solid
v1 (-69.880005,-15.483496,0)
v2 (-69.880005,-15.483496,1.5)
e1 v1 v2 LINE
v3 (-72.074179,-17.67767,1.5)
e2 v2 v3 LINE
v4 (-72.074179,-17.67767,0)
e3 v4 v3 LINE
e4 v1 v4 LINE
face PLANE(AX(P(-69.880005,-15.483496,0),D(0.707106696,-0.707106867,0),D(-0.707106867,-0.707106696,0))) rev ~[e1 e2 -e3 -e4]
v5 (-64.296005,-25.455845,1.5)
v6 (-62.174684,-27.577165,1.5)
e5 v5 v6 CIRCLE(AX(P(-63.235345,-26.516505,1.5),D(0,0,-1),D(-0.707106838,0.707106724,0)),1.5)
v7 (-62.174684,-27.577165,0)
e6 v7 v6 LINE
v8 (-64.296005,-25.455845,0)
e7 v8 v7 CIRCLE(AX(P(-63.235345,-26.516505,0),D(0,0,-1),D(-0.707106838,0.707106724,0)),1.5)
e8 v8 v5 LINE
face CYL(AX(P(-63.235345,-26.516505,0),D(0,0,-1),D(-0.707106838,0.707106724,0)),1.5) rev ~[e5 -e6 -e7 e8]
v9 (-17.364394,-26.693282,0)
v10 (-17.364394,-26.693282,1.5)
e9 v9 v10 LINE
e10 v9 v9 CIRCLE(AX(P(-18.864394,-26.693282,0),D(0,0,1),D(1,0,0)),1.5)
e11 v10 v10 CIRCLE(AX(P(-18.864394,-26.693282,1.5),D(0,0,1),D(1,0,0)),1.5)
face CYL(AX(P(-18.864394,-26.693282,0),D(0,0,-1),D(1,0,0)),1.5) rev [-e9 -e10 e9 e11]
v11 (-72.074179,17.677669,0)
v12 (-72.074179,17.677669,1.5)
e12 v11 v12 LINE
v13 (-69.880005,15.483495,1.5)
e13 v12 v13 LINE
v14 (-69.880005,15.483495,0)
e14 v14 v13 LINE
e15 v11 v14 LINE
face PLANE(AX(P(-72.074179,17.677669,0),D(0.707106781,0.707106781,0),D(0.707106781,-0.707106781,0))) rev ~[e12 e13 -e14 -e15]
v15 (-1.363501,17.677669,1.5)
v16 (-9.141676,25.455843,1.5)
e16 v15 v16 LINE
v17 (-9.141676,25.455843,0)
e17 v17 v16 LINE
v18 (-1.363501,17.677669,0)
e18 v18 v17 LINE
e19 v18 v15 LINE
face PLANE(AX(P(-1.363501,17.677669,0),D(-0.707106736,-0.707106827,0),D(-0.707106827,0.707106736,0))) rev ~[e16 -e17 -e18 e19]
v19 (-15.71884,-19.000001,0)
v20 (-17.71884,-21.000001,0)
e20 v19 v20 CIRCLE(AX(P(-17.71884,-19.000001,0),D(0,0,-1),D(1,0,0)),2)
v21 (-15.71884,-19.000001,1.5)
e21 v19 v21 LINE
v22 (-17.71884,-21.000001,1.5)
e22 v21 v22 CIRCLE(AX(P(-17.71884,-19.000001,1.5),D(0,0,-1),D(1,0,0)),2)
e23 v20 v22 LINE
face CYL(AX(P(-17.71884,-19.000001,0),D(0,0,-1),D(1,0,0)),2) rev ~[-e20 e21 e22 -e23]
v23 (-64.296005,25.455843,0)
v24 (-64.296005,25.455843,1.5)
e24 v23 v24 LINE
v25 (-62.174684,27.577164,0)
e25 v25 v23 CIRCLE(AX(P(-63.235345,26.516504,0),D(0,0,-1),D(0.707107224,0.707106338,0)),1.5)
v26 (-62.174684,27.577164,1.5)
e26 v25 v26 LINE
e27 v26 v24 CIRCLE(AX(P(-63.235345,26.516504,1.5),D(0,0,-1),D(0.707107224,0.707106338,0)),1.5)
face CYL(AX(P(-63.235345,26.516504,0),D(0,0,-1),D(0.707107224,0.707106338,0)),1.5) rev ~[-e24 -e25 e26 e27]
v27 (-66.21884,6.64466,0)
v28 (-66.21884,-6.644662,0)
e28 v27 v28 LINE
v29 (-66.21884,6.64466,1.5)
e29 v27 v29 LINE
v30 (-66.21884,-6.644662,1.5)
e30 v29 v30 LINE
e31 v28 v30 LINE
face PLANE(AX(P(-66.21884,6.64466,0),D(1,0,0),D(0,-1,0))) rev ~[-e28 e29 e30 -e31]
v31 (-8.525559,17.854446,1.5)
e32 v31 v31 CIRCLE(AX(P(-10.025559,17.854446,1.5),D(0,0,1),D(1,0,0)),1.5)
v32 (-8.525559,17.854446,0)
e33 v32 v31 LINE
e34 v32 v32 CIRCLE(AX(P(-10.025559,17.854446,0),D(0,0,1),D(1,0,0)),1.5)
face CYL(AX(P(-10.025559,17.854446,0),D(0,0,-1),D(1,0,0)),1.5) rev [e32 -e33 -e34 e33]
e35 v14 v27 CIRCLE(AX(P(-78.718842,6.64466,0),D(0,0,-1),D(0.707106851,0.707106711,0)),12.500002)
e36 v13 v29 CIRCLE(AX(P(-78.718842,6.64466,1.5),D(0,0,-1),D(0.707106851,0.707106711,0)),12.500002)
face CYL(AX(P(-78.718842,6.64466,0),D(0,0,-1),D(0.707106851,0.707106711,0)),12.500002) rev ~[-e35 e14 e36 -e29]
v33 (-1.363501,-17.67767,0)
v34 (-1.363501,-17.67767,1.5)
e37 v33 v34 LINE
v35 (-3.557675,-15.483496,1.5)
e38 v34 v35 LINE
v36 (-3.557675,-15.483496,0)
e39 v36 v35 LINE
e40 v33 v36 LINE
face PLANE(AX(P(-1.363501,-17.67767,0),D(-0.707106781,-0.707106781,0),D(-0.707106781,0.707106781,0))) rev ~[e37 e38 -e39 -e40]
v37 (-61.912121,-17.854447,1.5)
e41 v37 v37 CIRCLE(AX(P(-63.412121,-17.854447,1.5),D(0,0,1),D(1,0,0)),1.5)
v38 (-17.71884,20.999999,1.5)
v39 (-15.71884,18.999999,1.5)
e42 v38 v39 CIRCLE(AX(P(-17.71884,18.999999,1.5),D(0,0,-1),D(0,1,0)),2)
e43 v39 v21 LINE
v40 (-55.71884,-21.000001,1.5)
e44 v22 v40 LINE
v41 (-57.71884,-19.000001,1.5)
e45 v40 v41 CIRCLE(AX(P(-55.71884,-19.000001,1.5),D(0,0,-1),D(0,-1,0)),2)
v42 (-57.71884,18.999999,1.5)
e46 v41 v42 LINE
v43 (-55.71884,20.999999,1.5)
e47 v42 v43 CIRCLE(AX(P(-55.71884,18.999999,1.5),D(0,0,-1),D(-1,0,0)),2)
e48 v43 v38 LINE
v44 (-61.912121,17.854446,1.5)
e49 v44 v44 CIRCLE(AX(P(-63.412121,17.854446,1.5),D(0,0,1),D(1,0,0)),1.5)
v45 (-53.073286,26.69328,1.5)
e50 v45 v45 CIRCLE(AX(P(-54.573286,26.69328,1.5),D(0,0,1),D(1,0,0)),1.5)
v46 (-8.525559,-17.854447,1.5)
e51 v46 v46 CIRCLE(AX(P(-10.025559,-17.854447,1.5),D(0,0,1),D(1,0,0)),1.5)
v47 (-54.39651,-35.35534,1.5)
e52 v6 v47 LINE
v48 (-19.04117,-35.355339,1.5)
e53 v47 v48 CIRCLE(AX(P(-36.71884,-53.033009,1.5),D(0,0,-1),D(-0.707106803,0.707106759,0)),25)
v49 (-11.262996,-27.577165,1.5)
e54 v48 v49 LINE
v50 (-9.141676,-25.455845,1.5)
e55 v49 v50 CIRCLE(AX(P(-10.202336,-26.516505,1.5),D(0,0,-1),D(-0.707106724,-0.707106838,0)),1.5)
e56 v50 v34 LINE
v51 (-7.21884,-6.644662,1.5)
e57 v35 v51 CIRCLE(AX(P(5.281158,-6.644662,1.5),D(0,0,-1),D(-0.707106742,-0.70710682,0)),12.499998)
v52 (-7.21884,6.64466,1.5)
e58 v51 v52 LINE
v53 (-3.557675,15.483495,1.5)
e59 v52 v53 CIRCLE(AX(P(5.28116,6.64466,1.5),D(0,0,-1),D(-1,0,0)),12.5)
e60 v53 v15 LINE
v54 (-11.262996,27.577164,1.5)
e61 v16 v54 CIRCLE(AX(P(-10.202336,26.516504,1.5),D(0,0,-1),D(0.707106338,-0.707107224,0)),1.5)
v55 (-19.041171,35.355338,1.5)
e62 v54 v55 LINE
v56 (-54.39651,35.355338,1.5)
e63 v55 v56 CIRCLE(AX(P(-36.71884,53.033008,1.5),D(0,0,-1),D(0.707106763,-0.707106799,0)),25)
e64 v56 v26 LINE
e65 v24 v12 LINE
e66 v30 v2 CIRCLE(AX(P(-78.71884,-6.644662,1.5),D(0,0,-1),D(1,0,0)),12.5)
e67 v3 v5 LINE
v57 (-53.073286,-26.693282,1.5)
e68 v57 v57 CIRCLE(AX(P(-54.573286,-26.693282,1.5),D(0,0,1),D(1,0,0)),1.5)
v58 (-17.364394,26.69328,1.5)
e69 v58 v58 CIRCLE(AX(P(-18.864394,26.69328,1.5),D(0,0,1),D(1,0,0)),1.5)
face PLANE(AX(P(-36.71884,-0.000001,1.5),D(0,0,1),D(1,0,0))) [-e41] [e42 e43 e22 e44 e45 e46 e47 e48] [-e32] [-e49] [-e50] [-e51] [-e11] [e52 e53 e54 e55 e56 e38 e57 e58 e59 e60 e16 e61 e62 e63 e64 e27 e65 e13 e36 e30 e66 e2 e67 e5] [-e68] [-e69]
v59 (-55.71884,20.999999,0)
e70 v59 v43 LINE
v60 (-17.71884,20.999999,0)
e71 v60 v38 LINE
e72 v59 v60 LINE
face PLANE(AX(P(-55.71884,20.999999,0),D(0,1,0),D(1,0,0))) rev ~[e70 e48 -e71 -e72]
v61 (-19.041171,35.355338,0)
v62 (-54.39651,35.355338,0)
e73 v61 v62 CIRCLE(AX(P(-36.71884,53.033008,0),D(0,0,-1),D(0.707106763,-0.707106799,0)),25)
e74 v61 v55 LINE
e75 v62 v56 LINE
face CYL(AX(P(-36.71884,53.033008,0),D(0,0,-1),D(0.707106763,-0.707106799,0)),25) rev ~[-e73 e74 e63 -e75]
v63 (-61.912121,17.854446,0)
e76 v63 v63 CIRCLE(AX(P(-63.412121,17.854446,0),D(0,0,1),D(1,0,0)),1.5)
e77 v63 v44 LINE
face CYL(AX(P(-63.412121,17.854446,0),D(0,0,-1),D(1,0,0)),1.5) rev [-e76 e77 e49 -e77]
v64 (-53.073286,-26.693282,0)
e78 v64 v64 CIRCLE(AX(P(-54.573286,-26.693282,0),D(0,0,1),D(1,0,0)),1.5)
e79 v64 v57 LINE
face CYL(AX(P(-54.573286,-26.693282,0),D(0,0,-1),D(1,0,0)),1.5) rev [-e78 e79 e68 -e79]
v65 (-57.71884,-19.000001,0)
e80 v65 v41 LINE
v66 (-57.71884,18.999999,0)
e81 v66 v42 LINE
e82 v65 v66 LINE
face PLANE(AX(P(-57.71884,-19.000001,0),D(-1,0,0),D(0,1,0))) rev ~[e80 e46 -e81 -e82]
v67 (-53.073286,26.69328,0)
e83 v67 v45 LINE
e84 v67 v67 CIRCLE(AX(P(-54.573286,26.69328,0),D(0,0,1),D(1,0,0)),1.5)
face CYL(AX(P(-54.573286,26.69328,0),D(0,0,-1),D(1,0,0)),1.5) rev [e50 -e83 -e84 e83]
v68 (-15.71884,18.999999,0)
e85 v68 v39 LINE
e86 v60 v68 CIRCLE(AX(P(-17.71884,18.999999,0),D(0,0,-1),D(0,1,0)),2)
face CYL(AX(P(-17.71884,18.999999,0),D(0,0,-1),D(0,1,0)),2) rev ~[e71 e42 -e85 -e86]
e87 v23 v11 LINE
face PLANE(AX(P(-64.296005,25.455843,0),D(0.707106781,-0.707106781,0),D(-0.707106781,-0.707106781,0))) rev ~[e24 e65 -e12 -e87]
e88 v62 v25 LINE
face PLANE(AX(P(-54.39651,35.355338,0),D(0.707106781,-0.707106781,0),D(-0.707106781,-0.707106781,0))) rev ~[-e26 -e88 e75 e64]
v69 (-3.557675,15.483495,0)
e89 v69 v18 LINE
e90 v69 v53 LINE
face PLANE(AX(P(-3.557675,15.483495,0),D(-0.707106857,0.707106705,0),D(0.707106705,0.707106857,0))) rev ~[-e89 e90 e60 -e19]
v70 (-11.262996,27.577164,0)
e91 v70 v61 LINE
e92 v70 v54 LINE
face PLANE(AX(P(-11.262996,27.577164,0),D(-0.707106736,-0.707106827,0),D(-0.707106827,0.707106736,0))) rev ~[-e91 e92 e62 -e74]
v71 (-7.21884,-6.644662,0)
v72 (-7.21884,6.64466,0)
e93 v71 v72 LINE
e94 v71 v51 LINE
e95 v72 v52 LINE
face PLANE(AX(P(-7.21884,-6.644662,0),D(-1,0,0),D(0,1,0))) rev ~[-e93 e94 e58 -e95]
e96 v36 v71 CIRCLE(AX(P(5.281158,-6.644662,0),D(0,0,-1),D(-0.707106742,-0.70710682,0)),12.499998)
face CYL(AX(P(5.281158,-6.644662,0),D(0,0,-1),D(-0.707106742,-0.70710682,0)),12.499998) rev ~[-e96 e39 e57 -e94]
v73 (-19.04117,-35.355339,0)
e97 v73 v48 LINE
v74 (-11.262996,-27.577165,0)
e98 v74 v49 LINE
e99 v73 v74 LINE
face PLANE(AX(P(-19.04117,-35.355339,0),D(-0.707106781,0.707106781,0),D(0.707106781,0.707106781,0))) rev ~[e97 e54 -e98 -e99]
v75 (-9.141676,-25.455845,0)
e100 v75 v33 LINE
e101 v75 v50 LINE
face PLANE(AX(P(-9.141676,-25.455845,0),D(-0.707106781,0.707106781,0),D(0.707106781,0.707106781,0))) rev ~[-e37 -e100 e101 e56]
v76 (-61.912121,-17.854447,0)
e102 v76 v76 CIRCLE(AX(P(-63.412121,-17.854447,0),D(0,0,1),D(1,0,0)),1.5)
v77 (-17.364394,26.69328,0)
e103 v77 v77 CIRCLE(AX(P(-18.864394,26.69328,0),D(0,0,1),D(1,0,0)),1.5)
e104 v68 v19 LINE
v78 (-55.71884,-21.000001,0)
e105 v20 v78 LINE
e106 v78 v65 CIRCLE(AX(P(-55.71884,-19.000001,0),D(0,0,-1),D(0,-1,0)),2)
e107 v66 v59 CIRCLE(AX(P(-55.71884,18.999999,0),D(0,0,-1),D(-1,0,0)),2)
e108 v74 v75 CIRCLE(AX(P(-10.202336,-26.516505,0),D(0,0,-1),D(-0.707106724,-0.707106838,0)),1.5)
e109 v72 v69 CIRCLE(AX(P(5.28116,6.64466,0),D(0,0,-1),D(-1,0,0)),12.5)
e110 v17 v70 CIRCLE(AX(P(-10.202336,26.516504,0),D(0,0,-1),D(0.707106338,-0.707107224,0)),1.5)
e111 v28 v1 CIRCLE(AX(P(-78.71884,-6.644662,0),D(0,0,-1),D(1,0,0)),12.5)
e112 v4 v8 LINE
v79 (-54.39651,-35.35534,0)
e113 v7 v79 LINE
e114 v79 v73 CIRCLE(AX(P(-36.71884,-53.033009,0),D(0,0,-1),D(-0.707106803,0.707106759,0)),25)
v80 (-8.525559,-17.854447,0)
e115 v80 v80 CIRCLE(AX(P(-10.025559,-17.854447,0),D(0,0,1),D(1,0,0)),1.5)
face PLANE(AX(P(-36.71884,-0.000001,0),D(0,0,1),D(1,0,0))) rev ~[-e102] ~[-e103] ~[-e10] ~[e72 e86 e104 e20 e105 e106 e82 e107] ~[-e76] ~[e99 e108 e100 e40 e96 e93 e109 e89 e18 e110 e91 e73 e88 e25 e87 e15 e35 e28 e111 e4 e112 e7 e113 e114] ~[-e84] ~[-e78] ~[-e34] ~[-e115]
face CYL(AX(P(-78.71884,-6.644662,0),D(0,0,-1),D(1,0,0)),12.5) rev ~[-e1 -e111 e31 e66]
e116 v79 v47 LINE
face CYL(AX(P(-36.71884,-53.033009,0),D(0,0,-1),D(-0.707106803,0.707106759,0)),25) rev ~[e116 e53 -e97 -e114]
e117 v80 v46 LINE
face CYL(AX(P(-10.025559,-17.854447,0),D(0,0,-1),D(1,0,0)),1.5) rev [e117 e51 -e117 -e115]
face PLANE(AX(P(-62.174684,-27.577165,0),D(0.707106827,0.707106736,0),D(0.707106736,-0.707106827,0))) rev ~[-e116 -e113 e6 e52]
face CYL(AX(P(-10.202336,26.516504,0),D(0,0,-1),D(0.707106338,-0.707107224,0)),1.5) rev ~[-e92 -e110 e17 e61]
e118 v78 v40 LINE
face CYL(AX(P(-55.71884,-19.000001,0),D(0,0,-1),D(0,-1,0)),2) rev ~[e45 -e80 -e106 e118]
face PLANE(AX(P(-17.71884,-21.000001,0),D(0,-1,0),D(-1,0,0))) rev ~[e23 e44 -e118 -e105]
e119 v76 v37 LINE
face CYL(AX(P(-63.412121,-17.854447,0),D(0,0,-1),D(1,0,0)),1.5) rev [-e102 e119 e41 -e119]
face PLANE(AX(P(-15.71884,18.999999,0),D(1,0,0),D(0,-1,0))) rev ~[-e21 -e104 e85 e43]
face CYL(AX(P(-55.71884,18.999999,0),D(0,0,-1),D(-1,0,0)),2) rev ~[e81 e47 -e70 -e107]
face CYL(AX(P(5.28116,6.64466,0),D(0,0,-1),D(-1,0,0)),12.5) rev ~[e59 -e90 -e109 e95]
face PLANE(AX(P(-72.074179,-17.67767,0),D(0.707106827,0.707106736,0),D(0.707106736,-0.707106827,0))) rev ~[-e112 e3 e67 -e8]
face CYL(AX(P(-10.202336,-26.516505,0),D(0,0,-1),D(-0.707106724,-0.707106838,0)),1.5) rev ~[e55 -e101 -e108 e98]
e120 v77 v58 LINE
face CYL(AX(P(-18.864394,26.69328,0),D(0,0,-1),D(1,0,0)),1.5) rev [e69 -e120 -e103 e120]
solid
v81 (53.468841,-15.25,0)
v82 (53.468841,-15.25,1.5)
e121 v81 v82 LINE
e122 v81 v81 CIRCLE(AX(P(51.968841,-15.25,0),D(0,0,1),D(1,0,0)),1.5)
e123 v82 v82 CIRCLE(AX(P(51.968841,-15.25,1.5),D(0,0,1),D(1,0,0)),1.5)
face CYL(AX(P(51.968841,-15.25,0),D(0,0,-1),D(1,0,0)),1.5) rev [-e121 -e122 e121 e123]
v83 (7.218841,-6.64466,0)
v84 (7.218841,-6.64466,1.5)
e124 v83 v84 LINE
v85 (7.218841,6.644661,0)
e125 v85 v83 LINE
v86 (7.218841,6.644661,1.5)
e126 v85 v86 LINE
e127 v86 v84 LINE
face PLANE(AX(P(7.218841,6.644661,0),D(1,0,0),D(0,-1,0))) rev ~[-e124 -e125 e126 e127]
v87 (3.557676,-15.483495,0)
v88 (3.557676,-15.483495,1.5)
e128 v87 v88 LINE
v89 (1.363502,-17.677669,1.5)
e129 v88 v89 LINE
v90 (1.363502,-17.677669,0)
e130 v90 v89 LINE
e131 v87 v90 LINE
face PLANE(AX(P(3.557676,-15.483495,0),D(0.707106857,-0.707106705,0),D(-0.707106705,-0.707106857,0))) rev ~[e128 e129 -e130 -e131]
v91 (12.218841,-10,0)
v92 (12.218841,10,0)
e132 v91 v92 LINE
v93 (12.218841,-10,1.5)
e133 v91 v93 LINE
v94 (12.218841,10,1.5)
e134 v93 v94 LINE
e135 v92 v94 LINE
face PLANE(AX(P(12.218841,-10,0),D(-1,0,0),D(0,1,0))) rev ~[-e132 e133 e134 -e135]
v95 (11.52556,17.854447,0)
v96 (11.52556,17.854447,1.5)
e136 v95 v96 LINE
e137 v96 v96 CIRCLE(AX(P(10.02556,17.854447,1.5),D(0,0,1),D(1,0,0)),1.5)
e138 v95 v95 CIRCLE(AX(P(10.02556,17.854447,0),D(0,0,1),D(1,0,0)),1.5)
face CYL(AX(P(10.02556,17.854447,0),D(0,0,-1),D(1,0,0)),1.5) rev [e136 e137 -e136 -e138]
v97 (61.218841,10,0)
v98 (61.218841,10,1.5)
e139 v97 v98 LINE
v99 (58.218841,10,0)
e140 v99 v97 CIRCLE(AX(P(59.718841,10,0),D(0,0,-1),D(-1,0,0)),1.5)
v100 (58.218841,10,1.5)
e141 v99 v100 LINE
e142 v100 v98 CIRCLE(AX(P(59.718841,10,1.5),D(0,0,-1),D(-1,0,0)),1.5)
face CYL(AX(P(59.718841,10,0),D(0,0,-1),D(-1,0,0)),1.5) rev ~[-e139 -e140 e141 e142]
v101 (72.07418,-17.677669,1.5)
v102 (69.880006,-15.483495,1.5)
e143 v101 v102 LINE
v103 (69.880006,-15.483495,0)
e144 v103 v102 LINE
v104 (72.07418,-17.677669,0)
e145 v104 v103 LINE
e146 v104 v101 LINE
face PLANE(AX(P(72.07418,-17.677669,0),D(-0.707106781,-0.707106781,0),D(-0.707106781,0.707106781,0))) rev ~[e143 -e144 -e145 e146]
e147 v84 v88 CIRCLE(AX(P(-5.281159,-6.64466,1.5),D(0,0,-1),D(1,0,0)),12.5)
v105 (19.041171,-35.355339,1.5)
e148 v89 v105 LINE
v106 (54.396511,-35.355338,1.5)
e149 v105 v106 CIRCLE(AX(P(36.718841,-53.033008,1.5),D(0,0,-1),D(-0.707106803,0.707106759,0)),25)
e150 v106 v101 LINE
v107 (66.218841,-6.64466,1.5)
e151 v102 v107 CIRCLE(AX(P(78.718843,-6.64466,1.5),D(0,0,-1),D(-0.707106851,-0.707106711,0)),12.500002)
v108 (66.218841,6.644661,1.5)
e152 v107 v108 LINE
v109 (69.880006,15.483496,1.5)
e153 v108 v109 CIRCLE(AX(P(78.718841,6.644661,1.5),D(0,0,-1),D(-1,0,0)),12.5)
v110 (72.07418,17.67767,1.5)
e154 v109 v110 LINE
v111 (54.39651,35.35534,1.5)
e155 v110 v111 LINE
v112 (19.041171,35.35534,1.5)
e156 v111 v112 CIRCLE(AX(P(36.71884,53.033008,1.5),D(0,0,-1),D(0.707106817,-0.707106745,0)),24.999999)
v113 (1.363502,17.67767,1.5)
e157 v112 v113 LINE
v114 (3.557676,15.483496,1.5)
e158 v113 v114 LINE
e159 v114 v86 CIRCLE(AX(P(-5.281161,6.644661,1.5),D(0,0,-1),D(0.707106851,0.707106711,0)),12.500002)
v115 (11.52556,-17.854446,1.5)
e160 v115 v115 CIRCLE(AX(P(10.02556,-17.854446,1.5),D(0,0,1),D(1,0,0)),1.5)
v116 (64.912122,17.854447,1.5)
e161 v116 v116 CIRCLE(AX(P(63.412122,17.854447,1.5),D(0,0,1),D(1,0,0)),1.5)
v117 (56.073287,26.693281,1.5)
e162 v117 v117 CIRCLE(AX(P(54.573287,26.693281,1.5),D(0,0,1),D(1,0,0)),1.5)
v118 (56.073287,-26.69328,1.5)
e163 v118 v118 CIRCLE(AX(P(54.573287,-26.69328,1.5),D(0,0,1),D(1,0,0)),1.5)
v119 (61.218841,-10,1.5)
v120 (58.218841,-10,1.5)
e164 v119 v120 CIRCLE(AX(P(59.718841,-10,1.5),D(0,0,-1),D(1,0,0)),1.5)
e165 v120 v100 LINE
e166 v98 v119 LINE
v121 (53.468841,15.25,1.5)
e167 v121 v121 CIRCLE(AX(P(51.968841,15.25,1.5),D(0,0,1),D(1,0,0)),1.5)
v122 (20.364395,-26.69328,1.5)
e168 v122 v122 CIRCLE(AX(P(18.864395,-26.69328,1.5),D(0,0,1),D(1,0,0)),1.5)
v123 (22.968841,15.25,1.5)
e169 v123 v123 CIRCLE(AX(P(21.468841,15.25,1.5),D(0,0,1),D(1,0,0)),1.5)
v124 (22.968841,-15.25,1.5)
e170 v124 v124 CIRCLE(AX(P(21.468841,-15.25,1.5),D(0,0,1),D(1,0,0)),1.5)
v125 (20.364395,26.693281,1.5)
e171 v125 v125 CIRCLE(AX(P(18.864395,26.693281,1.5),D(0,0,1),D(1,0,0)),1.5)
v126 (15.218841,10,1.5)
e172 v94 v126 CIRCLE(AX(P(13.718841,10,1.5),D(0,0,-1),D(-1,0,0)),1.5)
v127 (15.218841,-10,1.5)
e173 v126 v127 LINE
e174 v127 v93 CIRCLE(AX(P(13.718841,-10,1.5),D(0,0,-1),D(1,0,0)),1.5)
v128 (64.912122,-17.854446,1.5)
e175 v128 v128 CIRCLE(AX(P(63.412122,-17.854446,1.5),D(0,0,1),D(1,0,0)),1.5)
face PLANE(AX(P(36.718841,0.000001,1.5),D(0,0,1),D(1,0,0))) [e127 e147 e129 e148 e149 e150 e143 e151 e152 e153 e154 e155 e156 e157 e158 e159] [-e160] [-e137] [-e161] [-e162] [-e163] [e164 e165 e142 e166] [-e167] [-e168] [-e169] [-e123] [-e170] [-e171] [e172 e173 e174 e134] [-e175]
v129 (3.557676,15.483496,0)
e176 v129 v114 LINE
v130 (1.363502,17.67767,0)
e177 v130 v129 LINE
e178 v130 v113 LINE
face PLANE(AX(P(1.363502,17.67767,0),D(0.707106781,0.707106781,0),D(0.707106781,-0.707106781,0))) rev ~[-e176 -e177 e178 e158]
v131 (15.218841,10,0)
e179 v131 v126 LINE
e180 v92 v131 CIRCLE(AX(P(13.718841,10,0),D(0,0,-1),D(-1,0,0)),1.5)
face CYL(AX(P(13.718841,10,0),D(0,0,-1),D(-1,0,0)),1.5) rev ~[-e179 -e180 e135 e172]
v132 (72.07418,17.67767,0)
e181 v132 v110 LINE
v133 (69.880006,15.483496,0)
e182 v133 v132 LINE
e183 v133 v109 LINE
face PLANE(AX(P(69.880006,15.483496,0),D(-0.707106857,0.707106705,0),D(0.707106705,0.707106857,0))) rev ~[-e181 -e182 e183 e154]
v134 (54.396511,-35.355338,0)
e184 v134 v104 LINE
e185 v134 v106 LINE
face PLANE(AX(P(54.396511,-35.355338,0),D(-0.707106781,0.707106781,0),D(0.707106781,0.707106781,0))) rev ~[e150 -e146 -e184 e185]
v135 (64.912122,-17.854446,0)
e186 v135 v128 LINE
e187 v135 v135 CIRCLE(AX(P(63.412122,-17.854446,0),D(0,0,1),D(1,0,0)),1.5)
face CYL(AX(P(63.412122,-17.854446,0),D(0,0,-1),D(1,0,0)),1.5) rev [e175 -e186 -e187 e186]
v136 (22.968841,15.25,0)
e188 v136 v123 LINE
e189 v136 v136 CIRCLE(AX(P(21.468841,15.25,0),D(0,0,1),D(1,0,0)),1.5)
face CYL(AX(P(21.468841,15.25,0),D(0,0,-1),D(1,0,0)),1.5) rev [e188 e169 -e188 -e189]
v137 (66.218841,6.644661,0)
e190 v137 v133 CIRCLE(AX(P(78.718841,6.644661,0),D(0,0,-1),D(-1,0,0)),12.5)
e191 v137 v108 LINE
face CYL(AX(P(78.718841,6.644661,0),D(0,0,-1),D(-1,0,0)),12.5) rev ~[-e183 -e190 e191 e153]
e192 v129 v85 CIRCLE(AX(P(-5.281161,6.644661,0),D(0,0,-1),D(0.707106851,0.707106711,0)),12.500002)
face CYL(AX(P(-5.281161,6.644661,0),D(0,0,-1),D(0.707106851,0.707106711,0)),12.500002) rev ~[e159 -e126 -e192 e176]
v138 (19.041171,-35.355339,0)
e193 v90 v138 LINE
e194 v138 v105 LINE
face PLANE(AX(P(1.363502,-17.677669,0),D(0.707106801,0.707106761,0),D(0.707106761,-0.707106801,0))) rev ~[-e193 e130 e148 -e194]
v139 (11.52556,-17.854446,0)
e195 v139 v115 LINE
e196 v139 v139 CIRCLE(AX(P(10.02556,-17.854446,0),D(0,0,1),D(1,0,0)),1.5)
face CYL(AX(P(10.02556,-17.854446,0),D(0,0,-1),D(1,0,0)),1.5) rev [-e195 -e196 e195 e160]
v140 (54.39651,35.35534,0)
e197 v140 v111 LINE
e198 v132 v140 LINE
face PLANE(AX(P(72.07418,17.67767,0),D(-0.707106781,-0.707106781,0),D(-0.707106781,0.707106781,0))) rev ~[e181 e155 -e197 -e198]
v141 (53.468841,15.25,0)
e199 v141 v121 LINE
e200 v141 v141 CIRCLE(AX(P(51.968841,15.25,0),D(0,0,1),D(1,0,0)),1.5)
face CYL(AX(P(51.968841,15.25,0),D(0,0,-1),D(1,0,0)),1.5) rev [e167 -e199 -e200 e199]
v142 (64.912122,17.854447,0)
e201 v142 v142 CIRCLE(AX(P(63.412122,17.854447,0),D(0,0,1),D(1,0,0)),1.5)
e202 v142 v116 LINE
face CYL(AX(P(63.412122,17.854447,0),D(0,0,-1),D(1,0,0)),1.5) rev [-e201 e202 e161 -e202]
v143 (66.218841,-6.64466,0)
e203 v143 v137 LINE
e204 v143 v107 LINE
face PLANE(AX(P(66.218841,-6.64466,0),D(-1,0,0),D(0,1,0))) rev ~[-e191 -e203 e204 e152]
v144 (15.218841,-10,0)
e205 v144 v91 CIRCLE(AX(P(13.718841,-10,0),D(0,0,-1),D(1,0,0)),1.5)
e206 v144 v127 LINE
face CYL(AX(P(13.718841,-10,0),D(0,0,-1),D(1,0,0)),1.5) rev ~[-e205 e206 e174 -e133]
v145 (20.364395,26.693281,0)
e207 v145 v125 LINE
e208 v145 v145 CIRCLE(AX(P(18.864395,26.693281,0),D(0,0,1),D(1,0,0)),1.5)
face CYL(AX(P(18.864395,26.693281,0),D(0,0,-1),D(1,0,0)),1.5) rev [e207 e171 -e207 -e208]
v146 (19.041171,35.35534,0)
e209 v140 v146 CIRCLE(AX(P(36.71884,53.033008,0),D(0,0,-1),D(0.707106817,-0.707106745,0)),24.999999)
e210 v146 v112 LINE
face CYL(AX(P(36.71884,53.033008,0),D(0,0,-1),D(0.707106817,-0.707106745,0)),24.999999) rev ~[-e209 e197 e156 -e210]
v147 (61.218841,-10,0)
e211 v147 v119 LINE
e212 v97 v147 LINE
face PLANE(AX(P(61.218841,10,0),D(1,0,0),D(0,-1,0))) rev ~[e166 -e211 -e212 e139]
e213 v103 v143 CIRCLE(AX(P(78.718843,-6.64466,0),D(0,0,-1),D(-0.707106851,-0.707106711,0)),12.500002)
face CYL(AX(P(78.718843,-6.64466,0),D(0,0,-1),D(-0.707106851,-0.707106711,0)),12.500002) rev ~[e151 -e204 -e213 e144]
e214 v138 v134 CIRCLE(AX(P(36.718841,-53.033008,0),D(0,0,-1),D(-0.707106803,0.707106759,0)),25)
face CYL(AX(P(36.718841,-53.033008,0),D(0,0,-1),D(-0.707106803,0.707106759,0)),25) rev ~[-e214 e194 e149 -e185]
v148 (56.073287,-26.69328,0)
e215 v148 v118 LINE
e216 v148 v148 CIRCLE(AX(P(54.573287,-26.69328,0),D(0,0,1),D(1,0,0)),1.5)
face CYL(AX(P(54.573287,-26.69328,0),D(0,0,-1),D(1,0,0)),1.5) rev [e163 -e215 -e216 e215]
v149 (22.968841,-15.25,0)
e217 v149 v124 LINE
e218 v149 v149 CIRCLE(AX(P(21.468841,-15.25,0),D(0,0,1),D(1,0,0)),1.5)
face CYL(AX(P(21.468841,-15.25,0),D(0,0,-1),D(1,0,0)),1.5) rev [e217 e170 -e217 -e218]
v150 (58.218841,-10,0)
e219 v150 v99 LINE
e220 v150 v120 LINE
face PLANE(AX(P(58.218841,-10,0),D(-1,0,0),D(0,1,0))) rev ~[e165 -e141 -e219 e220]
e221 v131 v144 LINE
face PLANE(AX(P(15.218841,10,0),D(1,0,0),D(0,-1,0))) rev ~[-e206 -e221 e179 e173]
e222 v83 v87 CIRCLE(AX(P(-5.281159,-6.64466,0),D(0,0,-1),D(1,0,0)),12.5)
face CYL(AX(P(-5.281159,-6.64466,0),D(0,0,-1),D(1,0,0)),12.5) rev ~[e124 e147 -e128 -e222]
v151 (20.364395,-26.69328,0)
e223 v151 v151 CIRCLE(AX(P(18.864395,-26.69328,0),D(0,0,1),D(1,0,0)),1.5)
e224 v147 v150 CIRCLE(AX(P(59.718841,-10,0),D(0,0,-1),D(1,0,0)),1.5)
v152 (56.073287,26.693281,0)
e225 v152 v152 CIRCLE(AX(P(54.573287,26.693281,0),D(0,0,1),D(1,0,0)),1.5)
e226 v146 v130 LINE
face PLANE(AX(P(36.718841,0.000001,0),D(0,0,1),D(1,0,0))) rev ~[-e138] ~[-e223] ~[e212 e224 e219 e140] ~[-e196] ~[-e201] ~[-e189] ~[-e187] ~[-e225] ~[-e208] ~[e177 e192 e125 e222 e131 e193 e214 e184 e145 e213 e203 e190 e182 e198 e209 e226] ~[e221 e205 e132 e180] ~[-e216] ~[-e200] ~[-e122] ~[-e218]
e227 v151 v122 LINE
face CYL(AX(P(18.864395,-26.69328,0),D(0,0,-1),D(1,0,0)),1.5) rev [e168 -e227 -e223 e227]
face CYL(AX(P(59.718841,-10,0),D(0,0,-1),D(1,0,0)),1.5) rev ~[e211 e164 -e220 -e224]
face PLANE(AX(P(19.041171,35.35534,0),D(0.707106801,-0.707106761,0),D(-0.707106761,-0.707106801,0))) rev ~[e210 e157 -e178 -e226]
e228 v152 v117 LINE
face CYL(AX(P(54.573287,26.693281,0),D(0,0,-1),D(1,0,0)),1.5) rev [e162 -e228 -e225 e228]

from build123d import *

# Parameters (mm, degrees)
F0_R     = 1.5
F1_DEPTH = 1.5


# Not quite as in the source:
# - ends of sketch curves that miss each other by under 0.0002 mm in the source are joined


with BuildPart() as f1:
    # F0 (on Top) → F1 (new body)
    with BuildSketch(Plane.XY):
        with BuildLine():
            Line((-66.21884, 6.64466), (-66.21884, -1e-06))
            Line((-66.21884, -1e-06), (-66.21884, -6.644662))
            ThreePointArc((-66.21884, -6.644662), (-67.1703457083, -11.4282045779), (-69.8800047352, -15.4834962648))
            Line((-69.8800047352, -15.4834962648), (-72.074179, -17.67767))
            Line((-72.074179, -17.67767), (-64.296005, -25.455845))
            ThreePointArc((-64.296005, -25.455845), (-62.1746850782, -25.4558445782), (-62.1746843282, -27.5771646718))
            Line((-62.1746843282, -27.5771646718), (-54.39651, -35.35534))
            ThreePointArc((-54.39651, -35.35534), (-36.7188403536, -28.033009), (-19.0411704703, -35.3553394703))
            Line((-19.0411704703, -35.3553394703), (-11.262996, -27.577165))
            ThreePointArc((-11.262996, -27.577165), (-11.2629961718, -25.4558448282), (-9.1416758282, -25.4558448282))
            Line((-9.1416758282, -25.4558448282), (-1.363501, -17.67767))
            Line((-1.363501, -17.67767), (-3.557675, -15.483496))
            ThreePointArc((-3.557675, -15.483496), (-6.2673342917, -11.4282045779), (-7.21884, -6.644662))
            Line((-7.21884, -6.644662), (-7.21884, -1e-06))
            Line((-7.21884, -1e-06), (-7.21884, 6.64466))
            ThreePointArc((-7.21884, 6.64466), (-6.2673341564, 11.4282029046), (-3.5576747648, 15.4834947648))
            Line((-3.5576747648, 15.4834947648), (-1.363501, 17.677669))
            Line((-1.363501, 17.677669), (-9.141676, 25.455843))
            ThreePointArc((-9.141676, 25.455843), (-11.2629964218, 25.4558440782), (-11.2629961718, 27.5771641718))
            Line((-11.2629961718, 27.5771641718), (-19.041171, 35.355338))
            ThreePointArc((-19.041171, 35.355338), (-36.7188403536, 28.033008), (-54.3965095297, 35.3553384703))
            Line((-54.3965095297, 35.3553384703), (-62.174684, 27.577164))
            ThreePointArc((-62.174684, 27.577164), (-62.1746848282, 25.4558438282), (-64.2960046718, 25.4558433282))
            Line((-64.2960046718, 25.4558433282), (-72.074179, 17.677669))
            Line((-72.074179, 17.677669), (-69.880005, 15.483495))
            ThreePointArc((-69.880005, 15.483495), (-67.1703458436, 11.4282029046), (-66.21884, 6.64466))
        make_face()
        with Locations((-54.573286, -26.693282)):
            Circle(F0_R, mode=Mode.SUBTRACT)
        with Locations((-63.412121, -17.854447)):
            Circle(F0_R, mode=Mode.SUBTRACT)
        with Locations((-18.864394, -26.693282)):
            Circle(F0_R, mode=Mode.SUBTRACT)
        with Locations((-10.025559, -17.854447)):
            Circle(F0_R, mode=Mode.SUBTRACT)
        with BuildLine():
            ThreePointArc((-57.71884, 18.999999), (-57.1330535624, 20.4142125624), (-55.71884, 20.999999))
            Line((-55.71884, 20.999999), (-17.71884, 20.999999))
            ThreePointArc((-17.71884, 20.999999), (-16.3046264376, 20.4142125624), (-15.71884, 18.999999))
            Line((-15.71884, 18.999999), (-15.71884, -19.000001))
            ThreePointArc((-15.71884, -19.000001), (-16.3046264376, -20.4142145624), (-17.71884, -21.000001))
            Line((-17.71884, -21.000001), (-55.71884, -21.000001))
            ThreePointArc((-55.71884, -21.000001), (-57.1330535624, -20.4142145624), (-57.71884, -19.000001))
            Line((-57.71884, -19.000001), (-57.71884, 18.999999))
        make_face(mode=Mode.SUBTRACT)
        with Locations((-63.412121, 17.854446)):
            Circle(F0_R, mode=Mode.SUBTRACT)
        with Locations((-54.573286, 26.69328)):
            Circle(F0_R, mode=Mode.SUBTRACT)
        with Locations((-10.025559, 17.854446)):
            Circle(F0_R, mode=Mode.SUBTRACT)
        with Locations((-18.864394, 26.69328)):
            Circle(F0_R, mode=Mode.SUBTRACT)
    extrude(amount=F1_DEPTH)


with BuildPart() as f1b:
    # F0 (on Top) → F1, piece 2 (new body)
    with BuildSketch(Plane.XY):
        with BuildLine():
            Line((7.218841, 6.644661), (7.218841, 0))
            Line((7.218841, 0), (7.218841, -6.64466))
            ThreePointArc((7.218841, -6.64466), (6.2673351564, -11.4282029046), (3.5576757648, -15.4834947648))
            Line((3.5576757648, -15.4834947648), (1.363502, -17.677669))
            Line((1.363502, -17.677669), (19.041171, -35.355339))
            ThreePointArc((19.041171, -35.355339), (36.7188406464, -28.033008), (54.3965105297, -35.3553384703))
            Line((54.3965105297, -35.3553384703), (72.07418, -17.677669))
            Line((72.07418, -17.677669), (69.880006, -15.483495))
            ThreePointArc((69.880006, -15.483495), (67.1703468436, -11.4282029046), (66.218841, -6.64466))
            Line((66.218841, -6.64466), (66.218841, 0))
            Line((66.218841, 0), (66.218841, 6.644661))
            ThreePointArc((66.218841, 6.644661), (67.1703468436, 11.4282039046), (69.8800062352, 15.4834957648))
            Line((69.8800062352, 15.4834957648), (72.07418, 17.67767))
            Line((72.07418, 17.67767), (54.39651, 35.35534))
            ThreePointArc((54.39651, 35.35534), (36.7188406464, 28.033009), (19.0411709703, 35.3553399703))
            Line((19.0411709703, 35.3553399703), (1.363502, 17.67767))
            Line((1.363502, 17.67767), (3.557676, 15.483496))
            ThreePointArc((3.557676, 15.483496), (6.2673351564, 11.4282039046), (7.218841, 6.644661))
        make_face()
        with Locations((18.864395, -26.69328)):
            Circle(F0_R, mode=Mode.SUBTRACT)
        with Locations((10.02556, -17.854446)):
            Circle(F0_R, mode=Mode.SUBTRACT)
        with Locations((54.573287, -26.69328)):
            Circle(F0_R, mode=Mode.SUBTRACT)
        with Locations((63.412122, -17.854446)):
            Circle(F0_R, mode=Mode.SUBTRACT)
        with Locations((21.468841, -15.25)):
            Circle(F0_R, mode=Mode.SUBTRACT)
        with Locations((51.968841, -15.25)):
            Circle(F0_R, mode=Mode.SUBTRACT)
        with BuildLine():
            ThreePointArc((15.218841, -10), (13.718841, -11.5), (12.218841, -10))
            Line((12.218841, -10), (12.218841, 0))
            Line((12.218841, 0), (12.218841, 10))
            ThreePointArc((12.218841, 10), (13.718841, 11.5), (15.218841, 10))
            Line((15.218841, 10), (15.218841, 0))
            Line((15.218841, 0), (15.218841, -10))
        make_face(mode=Mode.SUBTRACT)
        with Locations((21.468841, 15.25)):
            Circle(F0_R, mode=Mode.SUBTRACT)
        with BuildLine():
            ThreePointArc((61.218841, -10), (59.718841, -11.5), (58.218841, -10))
            Line((58.218841, -10), (58.218841, 0))
            Line((58.218841, 0), (58.218841, 10))
            ThreePointArc((58.218841, 10), (59.718841, 11.5), (61.218841, 10))
            Line((61.218841, 10), (61.218841, 0))
            Line((61.218841, 0), (61.218841, -10))
        make_face(mode=Mode.SUBTRACT)
        with Locations((51.968841, 15.25)):
            Circle(F0_R, mode=Mode.SUBTRACT)
        with Locations((10.02556, 17.854447)):
            Circle(F0_R, mode=Mode.SUBTRACT)
        with Locations((18.864395, 26.693281)):
            Circle(F0_R, mode=Mode.SUBTRACT)
        with Locations((63.412122, 17.854447)):
            Circle(F0_R, mode=Mode.SUBTRACT)
        with Locations((54.573287, 26.693281)):
            Circle(F0_R, mode=Mode.SUBTRACT)
    extrude(amount=F1_DEPTH)


solid = Compound([f1.part, f1b.part])
